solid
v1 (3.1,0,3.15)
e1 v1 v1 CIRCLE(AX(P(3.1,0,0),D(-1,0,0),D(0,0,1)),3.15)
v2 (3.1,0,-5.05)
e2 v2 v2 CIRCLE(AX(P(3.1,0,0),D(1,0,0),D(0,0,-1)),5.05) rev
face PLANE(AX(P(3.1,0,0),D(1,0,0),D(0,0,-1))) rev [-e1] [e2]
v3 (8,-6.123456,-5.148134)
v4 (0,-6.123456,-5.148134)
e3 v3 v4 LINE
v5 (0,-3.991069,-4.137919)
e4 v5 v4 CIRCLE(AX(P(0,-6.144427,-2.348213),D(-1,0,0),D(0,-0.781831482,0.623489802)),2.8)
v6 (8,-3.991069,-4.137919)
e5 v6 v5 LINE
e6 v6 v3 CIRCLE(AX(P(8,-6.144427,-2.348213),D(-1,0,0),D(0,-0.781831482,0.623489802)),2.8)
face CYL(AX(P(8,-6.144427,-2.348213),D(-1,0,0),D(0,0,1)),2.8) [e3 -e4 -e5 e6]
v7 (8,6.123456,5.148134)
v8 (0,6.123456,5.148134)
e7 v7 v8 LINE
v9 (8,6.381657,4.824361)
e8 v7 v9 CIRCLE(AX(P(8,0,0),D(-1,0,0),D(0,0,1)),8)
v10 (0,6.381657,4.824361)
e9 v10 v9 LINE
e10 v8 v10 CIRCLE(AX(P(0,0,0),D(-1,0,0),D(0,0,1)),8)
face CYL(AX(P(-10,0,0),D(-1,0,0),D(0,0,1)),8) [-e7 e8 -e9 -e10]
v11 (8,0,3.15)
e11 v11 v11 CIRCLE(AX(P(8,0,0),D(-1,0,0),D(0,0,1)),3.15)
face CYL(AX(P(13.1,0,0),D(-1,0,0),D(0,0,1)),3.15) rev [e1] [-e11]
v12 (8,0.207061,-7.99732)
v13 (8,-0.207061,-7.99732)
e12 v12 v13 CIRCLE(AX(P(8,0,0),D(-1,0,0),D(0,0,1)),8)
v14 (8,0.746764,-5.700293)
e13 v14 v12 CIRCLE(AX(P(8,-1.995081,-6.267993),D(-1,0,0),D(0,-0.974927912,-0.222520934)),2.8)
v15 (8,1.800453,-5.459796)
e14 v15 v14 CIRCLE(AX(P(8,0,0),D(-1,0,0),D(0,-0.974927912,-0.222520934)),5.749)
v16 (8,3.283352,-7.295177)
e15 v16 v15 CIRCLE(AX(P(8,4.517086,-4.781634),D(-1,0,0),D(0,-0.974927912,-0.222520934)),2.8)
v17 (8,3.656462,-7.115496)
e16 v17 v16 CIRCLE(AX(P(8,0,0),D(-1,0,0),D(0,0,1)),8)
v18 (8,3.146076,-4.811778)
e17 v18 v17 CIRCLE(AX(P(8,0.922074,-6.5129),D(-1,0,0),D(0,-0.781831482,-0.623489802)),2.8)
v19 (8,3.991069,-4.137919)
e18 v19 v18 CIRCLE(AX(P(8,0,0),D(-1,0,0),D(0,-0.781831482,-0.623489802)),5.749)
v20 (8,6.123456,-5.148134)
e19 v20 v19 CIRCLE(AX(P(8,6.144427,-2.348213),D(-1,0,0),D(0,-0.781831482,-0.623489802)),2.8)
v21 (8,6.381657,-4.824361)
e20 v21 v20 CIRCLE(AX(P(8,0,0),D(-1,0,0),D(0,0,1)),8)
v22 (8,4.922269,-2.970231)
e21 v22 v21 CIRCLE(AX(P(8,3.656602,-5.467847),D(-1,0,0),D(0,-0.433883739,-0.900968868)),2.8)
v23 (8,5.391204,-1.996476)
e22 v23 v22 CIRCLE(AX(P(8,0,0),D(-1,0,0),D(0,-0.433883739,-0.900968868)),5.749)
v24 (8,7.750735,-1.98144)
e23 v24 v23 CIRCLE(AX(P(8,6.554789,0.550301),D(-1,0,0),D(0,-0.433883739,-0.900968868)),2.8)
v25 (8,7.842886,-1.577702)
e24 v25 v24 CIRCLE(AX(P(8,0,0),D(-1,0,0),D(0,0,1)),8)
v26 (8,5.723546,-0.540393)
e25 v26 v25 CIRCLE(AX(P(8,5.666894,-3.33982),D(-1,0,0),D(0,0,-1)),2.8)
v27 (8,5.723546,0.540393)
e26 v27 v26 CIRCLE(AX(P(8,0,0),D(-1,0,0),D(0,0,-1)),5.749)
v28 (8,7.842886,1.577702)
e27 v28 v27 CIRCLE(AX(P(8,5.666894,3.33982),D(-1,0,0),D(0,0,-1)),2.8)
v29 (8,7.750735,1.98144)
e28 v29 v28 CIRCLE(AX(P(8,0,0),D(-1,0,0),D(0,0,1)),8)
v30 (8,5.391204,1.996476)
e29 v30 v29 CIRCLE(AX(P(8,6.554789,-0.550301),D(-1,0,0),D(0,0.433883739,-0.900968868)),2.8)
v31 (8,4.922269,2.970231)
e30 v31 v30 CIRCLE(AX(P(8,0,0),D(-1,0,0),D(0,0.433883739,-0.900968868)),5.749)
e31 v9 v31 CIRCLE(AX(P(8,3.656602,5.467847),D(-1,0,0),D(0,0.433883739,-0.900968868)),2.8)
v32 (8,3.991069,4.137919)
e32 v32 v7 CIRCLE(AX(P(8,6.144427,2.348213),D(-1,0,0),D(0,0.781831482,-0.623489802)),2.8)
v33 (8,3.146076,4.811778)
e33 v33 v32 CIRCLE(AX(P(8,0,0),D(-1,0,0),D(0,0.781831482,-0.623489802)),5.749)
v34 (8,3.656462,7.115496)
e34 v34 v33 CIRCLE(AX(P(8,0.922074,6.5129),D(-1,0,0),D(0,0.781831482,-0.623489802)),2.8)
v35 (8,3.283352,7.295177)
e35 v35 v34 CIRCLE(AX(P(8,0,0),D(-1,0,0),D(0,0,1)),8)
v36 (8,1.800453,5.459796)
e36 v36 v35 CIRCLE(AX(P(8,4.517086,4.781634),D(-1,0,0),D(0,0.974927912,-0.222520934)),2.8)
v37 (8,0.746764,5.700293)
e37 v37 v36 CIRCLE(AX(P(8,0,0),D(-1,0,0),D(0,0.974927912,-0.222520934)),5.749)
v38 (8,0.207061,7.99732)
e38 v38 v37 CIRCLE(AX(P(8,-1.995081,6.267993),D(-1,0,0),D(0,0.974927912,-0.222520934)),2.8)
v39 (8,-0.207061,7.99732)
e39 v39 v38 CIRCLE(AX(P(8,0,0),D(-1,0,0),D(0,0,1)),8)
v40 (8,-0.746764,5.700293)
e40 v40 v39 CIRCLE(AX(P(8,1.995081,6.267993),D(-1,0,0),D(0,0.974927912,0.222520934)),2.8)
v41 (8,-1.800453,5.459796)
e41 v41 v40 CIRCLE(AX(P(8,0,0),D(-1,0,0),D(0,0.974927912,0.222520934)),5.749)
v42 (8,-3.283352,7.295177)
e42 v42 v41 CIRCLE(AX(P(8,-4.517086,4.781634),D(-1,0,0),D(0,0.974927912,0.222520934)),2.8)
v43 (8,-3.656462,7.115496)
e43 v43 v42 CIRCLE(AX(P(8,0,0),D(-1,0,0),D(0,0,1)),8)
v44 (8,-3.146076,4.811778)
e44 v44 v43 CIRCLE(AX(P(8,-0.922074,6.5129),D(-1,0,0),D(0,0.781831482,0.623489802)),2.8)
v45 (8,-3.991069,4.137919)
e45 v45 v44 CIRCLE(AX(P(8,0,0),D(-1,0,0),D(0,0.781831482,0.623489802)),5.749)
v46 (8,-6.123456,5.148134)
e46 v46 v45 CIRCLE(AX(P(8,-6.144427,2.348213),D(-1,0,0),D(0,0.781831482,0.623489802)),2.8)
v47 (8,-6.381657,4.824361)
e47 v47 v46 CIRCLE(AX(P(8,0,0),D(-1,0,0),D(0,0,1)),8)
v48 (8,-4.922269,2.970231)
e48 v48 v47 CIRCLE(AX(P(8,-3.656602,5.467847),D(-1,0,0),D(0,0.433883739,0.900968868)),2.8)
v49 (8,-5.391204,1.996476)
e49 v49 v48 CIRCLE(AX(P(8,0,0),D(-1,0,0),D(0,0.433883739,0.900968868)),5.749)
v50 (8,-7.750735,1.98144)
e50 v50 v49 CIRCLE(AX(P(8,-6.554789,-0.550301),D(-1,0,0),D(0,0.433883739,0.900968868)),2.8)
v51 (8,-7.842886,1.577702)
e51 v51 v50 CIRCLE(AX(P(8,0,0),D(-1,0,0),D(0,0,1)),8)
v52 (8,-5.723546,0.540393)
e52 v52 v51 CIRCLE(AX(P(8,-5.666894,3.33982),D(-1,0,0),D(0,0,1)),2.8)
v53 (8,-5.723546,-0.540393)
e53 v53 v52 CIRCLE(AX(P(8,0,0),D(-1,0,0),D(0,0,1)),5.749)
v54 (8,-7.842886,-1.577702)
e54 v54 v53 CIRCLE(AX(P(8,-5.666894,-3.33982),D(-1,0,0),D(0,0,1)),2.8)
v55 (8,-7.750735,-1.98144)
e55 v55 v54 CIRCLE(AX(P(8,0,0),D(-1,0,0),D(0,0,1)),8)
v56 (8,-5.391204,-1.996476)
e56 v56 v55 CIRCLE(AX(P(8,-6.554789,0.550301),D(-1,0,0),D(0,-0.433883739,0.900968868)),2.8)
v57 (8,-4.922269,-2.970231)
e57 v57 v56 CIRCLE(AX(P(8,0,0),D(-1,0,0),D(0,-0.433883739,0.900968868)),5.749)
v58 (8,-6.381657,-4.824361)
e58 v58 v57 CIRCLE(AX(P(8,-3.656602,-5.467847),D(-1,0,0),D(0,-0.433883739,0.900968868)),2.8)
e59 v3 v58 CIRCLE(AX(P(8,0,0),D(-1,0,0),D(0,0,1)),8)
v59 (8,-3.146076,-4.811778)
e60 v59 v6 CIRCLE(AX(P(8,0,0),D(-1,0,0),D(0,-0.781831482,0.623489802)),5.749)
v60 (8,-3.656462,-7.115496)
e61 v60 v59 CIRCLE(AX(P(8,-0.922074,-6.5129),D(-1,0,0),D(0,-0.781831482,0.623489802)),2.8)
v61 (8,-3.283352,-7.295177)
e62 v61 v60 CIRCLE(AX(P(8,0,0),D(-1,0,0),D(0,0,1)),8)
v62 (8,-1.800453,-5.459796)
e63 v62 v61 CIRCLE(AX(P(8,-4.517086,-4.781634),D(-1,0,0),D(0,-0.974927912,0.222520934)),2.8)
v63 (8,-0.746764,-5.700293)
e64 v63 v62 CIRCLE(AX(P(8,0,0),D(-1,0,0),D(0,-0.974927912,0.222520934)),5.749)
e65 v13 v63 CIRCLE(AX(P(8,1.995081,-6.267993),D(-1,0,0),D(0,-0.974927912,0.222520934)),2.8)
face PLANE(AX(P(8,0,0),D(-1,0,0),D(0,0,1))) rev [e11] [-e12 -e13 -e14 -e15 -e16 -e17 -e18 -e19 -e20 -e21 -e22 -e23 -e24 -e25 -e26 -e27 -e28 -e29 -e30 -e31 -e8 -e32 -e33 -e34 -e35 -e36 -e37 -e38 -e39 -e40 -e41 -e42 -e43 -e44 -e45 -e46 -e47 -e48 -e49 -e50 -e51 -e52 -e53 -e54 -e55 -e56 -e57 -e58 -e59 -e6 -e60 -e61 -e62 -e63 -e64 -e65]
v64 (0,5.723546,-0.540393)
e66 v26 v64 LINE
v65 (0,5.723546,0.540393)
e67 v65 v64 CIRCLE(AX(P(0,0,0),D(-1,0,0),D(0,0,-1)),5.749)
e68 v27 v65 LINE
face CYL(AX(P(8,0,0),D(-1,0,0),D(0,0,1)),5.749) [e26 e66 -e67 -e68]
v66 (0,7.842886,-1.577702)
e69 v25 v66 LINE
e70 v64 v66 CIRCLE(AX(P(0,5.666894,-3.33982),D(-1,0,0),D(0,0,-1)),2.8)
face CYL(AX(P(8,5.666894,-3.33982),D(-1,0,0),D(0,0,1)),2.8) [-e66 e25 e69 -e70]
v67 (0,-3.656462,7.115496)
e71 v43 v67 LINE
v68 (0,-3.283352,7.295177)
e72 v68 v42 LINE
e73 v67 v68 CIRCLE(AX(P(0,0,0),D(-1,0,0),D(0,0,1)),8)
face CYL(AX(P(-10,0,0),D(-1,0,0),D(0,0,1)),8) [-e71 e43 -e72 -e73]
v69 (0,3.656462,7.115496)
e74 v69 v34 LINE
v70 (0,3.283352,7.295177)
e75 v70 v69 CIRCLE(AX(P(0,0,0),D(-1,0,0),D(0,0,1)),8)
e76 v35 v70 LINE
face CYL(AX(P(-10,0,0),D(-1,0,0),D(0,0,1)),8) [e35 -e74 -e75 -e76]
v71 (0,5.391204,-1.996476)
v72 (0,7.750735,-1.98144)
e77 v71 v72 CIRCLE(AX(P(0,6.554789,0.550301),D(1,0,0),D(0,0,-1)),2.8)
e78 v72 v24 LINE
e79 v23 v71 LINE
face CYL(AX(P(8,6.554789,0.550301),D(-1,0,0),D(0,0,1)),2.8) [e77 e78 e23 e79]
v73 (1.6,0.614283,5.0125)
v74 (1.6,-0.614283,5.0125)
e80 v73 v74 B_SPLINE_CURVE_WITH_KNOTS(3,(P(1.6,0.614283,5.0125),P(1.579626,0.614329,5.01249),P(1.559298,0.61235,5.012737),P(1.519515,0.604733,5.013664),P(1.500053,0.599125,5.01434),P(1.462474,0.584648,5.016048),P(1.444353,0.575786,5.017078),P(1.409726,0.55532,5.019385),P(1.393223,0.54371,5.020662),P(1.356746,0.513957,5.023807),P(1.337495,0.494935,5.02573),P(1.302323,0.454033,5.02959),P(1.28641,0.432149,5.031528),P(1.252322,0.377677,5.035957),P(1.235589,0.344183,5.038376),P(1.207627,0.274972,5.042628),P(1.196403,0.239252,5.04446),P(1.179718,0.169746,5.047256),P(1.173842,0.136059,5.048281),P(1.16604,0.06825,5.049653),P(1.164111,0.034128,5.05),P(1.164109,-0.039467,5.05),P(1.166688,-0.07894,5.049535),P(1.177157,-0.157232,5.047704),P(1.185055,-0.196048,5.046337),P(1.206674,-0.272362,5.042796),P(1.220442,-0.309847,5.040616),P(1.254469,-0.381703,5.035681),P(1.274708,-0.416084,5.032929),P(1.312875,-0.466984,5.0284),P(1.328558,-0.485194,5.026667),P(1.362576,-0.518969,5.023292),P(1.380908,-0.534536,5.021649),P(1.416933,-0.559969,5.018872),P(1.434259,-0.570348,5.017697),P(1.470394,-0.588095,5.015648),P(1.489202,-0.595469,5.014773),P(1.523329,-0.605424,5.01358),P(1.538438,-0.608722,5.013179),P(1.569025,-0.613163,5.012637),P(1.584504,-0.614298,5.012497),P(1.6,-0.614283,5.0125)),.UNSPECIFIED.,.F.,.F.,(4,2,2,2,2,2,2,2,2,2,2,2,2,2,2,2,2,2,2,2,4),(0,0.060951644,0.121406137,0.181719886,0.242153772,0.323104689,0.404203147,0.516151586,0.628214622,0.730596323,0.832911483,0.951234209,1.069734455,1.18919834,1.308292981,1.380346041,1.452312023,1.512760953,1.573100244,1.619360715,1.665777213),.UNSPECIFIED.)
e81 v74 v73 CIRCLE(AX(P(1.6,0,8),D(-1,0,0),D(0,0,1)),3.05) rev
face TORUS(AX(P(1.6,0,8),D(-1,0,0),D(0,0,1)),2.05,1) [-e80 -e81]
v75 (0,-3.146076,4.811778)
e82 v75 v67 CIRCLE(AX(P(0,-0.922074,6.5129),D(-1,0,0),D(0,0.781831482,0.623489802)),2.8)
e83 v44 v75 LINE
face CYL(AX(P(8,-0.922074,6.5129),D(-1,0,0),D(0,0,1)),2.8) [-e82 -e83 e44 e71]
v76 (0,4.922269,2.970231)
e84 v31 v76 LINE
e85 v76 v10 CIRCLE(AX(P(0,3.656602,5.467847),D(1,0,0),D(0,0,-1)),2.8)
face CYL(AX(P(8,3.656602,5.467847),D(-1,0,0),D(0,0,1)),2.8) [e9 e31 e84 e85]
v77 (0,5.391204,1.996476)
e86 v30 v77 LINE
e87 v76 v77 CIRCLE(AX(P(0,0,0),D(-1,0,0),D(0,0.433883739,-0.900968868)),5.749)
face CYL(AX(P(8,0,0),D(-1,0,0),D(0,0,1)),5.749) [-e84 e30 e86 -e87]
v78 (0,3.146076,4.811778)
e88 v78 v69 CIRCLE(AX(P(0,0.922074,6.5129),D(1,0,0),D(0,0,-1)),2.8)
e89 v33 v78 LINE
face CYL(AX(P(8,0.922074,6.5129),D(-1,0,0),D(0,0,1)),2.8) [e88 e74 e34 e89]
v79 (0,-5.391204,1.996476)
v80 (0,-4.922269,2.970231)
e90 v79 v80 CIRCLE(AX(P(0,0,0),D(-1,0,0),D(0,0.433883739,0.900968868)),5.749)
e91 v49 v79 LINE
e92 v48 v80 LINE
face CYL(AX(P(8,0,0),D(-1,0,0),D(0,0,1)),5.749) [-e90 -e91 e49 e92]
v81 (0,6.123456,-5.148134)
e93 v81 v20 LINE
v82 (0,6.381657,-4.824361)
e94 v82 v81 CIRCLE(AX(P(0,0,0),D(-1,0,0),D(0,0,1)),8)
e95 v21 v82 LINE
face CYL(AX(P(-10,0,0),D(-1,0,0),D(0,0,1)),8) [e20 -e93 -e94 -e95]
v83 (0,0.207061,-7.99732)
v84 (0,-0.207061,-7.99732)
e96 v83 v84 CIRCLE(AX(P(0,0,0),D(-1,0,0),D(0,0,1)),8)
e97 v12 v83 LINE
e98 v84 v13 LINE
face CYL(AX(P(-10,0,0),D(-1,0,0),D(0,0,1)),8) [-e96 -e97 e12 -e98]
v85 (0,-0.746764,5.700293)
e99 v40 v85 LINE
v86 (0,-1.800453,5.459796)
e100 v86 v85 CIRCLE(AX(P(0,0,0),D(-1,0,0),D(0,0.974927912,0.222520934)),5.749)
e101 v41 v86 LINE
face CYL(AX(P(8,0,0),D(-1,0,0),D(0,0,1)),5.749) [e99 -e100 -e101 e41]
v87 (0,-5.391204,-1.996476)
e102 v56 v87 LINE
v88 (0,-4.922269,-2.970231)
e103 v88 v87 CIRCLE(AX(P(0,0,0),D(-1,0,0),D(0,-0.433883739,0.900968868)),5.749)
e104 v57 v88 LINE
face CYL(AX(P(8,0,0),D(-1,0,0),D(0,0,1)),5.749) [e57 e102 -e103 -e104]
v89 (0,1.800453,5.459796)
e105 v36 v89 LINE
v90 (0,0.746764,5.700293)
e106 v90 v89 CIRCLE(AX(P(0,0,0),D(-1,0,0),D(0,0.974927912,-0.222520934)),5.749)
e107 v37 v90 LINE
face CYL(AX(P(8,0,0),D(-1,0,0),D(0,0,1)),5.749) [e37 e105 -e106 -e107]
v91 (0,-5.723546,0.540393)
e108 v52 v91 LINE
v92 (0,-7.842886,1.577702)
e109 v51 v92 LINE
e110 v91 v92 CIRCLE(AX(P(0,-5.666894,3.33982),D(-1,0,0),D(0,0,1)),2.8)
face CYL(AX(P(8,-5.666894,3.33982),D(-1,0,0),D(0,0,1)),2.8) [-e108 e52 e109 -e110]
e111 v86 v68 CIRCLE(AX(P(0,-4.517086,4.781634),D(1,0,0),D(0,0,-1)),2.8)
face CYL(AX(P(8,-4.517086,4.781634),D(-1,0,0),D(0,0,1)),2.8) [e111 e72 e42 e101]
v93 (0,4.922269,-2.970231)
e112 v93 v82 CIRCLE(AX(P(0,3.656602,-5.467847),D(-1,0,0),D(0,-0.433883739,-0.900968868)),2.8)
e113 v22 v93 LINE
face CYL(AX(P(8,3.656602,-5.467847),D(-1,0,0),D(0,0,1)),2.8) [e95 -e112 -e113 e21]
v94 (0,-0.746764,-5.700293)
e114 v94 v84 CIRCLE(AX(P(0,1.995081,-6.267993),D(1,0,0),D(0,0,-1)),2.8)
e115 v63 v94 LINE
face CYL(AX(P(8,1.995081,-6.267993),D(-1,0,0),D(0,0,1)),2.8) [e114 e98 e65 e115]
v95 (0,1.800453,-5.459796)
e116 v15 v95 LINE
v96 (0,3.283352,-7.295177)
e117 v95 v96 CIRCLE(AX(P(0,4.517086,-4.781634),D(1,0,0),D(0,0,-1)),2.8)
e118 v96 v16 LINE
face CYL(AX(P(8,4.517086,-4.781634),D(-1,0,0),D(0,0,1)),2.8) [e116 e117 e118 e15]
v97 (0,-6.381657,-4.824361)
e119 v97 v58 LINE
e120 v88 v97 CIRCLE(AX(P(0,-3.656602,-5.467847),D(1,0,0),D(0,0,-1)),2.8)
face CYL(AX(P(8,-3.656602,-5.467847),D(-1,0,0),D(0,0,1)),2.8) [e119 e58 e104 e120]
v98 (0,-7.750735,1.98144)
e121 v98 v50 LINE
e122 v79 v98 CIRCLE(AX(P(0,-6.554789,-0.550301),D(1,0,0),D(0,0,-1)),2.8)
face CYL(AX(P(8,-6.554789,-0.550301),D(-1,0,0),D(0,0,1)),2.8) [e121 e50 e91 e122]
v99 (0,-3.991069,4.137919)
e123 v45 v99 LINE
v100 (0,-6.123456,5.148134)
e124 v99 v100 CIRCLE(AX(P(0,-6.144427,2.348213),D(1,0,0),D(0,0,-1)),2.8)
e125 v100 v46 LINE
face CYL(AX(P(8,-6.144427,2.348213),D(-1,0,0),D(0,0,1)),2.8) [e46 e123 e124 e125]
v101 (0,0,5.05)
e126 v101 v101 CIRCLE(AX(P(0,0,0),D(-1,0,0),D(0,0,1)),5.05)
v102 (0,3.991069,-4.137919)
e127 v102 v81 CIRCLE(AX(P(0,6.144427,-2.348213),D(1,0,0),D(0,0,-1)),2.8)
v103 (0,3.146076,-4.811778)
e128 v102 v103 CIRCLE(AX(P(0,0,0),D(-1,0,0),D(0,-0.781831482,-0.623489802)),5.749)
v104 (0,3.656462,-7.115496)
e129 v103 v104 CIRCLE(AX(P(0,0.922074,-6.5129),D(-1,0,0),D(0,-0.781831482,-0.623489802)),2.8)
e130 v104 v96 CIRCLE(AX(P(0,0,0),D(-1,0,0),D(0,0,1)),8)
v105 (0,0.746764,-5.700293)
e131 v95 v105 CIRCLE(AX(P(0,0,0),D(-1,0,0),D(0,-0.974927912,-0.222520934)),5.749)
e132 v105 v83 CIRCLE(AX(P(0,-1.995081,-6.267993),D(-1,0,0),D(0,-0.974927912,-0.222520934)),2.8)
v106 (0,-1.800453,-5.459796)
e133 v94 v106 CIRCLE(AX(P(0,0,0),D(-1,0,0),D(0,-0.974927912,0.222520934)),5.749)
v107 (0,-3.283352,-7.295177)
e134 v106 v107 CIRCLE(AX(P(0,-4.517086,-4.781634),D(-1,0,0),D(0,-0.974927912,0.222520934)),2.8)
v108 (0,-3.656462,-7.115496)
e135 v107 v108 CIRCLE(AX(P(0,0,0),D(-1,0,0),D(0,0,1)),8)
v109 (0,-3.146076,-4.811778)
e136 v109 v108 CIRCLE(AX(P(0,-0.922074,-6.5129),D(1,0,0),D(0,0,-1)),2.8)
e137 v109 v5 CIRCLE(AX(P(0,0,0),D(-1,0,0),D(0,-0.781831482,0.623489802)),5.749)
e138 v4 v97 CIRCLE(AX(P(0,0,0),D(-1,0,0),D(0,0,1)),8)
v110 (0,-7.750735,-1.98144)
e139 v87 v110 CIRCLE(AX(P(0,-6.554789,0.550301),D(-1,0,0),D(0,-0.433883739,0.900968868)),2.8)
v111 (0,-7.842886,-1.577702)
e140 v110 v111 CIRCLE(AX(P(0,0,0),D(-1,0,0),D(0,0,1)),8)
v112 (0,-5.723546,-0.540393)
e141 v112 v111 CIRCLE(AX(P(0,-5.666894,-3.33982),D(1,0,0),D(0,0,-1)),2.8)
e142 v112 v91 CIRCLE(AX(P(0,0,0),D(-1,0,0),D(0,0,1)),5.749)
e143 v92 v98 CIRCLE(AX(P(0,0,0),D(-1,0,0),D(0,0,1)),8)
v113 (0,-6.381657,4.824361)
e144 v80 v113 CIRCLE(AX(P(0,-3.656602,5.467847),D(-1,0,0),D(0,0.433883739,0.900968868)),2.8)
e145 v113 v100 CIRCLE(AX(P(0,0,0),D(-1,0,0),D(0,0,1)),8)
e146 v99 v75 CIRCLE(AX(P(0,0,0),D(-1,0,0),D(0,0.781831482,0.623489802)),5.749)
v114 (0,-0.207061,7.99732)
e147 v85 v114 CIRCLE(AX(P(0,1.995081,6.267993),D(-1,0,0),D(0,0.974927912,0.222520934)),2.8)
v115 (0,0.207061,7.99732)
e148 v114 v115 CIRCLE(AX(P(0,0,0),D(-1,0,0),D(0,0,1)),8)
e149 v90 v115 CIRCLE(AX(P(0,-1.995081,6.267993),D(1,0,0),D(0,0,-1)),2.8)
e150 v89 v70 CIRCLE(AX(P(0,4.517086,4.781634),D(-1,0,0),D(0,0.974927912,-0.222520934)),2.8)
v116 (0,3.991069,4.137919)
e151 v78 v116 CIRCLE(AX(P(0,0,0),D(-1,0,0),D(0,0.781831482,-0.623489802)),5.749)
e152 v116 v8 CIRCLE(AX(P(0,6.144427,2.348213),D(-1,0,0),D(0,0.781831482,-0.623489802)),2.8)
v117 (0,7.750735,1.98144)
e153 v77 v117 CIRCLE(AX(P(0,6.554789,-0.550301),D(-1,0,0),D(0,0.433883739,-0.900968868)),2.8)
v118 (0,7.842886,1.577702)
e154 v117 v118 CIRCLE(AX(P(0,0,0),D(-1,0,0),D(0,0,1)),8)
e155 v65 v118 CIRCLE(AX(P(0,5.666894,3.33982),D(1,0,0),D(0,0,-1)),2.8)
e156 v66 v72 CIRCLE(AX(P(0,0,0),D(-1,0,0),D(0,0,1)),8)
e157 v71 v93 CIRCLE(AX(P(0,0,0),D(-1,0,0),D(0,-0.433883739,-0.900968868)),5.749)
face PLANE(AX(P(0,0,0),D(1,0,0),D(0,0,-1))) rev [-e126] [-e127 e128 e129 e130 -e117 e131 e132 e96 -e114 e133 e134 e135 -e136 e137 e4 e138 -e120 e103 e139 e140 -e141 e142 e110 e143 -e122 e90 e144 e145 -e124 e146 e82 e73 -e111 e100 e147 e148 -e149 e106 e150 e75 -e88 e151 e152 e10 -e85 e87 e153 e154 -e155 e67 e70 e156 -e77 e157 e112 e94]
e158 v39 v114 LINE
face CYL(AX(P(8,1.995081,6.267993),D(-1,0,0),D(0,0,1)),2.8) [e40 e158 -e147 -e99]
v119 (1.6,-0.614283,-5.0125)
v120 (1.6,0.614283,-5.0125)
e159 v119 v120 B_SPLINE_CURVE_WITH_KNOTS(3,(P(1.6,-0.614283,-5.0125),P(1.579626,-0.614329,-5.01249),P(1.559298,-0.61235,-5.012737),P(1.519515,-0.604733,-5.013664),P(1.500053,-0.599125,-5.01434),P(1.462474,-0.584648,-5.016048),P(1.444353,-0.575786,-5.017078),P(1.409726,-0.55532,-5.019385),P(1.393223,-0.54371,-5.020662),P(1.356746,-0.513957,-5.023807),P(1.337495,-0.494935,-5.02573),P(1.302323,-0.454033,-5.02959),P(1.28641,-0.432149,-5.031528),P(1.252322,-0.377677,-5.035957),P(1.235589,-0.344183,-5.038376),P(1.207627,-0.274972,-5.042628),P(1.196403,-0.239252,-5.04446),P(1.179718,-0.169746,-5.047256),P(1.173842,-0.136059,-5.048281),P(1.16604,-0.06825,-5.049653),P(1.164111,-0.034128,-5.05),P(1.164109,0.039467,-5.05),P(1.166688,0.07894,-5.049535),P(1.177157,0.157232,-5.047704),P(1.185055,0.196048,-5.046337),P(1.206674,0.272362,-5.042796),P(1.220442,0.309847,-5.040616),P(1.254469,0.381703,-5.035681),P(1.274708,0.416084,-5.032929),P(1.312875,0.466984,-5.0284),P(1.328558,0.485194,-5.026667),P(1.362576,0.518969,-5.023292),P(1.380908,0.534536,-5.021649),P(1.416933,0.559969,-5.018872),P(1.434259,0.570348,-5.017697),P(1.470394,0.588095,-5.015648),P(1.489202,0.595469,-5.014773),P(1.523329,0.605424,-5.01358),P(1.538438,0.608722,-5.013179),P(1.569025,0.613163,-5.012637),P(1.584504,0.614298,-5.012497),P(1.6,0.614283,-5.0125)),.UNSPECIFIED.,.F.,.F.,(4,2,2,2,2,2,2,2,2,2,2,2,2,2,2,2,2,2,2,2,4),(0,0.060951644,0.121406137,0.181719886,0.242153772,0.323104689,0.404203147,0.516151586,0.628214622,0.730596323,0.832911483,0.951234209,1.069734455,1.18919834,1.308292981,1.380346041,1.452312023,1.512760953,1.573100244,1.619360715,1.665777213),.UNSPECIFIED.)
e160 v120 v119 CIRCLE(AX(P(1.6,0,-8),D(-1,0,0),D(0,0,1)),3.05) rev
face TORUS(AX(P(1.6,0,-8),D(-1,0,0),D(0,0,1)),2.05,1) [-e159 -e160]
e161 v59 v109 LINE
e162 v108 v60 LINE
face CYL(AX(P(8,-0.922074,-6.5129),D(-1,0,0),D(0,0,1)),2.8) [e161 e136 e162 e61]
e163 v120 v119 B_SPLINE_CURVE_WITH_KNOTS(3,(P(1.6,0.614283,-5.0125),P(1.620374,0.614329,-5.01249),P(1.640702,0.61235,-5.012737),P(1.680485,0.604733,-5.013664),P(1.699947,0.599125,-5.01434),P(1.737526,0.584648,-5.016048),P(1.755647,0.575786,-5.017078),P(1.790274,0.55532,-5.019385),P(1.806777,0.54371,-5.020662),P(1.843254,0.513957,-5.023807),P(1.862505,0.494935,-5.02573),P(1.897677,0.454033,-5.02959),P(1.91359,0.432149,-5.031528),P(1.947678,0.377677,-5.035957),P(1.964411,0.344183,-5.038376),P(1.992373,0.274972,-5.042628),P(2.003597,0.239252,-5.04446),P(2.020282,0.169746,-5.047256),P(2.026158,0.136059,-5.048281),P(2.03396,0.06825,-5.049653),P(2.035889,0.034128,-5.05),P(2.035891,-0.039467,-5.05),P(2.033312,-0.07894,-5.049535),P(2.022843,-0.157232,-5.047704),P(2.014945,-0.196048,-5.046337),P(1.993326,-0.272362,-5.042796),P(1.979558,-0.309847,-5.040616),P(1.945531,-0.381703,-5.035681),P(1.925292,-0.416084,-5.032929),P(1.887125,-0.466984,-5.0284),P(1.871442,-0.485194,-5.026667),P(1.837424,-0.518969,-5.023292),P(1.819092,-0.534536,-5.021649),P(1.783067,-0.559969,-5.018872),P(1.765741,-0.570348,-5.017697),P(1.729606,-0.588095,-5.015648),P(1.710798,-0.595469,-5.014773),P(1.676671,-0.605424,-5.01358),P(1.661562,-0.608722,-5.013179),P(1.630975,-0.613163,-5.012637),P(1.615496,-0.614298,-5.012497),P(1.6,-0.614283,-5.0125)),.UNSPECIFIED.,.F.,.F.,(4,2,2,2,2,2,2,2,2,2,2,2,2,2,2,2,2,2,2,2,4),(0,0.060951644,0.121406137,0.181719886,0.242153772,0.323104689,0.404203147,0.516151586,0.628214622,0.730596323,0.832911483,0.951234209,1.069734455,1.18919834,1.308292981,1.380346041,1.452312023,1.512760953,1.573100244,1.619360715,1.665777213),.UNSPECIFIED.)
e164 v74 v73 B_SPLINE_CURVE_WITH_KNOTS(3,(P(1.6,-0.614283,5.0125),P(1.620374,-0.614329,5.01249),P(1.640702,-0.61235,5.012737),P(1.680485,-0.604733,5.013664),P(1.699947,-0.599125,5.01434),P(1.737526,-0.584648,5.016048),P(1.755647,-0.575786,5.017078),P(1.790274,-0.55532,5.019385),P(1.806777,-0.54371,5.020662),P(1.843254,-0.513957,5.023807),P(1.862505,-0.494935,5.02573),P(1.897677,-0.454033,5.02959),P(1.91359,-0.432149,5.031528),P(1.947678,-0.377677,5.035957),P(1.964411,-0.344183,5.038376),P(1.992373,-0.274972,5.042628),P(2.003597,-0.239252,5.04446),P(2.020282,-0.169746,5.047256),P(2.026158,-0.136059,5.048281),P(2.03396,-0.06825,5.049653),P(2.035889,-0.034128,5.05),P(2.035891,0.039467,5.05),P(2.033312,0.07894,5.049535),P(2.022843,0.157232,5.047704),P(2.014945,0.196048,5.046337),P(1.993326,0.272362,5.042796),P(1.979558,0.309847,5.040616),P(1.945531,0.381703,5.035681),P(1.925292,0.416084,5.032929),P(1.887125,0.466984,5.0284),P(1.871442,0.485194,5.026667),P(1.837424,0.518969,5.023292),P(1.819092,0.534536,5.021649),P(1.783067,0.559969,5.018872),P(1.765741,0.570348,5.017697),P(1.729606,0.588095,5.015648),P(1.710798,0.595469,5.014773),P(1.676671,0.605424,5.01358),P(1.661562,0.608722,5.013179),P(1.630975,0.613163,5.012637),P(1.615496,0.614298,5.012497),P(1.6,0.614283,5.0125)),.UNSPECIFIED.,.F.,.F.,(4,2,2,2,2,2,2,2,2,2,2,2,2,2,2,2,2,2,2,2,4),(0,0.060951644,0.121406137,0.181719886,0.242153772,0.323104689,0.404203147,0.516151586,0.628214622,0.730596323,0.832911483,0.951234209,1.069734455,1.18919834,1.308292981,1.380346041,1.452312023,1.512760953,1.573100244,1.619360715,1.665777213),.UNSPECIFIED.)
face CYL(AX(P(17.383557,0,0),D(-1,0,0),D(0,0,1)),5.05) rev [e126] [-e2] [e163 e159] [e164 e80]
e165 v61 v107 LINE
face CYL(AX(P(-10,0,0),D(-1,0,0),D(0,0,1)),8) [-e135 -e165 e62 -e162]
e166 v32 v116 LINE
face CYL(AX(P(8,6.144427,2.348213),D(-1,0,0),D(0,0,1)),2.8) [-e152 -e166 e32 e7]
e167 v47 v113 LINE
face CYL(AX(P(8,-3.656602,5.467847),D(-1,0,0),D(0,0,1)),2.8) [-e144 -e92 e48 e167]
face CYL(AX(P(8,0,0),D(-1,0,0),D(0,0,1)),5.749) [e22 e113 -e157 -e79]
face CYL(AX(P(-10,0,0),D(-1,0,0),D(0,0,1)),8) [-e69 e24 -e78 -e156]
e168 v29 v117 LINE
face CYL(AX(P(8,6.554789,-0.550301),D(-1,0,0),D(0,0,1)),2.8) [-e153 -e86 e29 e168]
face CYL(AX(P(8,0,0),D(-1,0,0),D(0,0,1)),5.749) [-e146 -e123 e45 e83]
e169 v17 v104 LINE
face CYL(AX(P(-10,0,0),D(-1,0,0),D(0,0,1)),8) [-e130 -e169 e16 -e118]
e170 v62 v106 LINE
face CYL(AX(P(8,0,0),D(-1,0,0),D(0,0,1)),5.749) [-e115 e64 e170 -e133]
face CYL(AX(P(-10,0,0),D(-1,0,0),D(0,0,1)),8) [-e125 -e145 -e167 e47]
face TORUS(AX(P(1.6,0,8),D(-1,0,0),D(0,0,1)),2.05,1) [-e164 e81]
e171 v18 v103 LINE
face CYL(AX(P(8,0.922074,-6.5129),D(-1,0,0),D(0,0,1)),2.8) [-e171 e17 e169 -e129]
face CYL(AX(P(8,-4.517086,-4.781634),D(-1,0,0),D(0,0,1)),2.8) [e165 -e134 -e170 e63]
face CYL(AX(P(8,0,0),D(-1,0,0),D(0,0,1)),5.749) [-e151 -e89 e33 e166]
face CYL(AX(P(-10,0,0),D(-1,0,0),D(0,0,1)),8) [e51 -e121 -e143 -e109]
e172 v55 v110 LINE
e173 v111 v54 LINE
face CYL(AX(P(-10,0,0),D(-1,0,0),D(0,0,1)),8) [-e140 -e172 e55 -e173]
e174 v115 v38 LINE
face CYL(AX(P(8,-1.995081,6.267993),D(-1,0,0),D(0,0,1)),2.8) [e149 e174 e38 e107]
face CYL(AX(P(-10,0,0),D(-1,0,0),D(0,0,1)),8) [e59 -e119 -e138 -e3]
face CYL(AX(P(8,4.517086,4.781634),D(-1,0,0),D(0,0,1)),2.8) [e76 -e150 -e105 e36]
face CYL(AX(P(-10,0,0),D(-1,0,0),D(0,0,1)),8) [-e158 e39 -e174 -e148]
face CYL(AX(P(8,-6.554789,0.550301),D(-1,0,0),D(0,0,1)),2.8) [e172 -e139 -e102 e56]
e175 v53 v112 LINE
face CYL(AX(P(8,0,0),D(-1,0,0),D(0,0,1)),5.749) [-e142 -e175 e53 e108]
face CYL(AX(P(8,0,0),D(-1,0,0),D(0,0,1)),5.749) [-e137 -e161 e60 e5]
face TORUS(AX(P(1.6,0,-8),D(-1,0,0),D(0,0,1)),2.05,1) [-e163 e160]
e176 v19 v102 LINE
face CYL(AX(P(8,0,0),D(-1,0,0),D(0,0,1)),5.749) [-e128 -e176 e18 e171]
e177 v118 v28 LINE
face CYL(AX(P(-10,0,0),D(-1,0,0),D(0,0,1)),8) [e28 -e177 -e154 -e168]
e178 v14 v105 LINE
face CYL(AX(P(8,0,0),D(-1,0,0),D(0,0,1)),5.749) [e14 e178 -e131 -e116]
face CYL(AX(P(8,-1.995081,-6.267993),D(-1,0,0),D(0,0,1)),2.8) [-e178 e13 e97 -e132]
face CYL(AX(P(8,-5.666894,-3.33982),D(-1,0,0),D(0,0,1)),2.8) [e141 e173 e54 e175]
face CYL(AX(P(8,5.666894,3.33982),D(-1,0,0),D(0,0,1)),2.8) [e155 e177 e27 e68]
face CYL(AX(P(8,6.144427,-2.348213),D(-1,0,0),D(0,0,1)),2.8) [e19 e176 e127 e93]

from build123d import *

# Parameters (mm, degrees)
BOSS_EXTRUDE1_START       = -4.9
BOSS_EXTRUDE1_DEPTH       = 4.9
BOSS_EXTRUDE1_START_2     = -8
BOSS_EXTRUDE1_2_OUTLINE_R = 5
BOSS_EXTRUDE1_2_DEPTH     = 3.1
SKETCH2_R                 = 5.05
CUT_EXTRUDE1_DEPTH        = 3.1
SKETCH3_R                 = 3.25
CUT_EXTRUDE2_DEPTH        = 13.227872143
SKETCH4_R                 = 4
CUT_EXTRUDE3_DEPTH        = 10
SKETCH5_R                 = 4
SKETCH5_R_2               = 3
BOSS_EXTRUDE2_DEPTH       = 4.9
BOSS_EXTRUDE3_DEPTH       = 1
BOSS_EXTRUDE3_DEPTH_BACK  = 1
FILLET1_R                 = 1
SKETCH8_R                 = 3.15
CUT_EXTRUDE4_DEPTH        = 10


with BuildPart() as part:
    # Boss-Extrude1: read off the stored shape, not the designer's step
    # Boss-Extrude1 outline → Boss-Extrude1 (new body)
    with BuildSketch(Plane(origin=(8, 0, 0), x_dir=(0, 0, -1), z_dir=(1, 0, 0)).offset(BOSS_EXTRUDE1_START)):
        with BuildLine():
            ThreePointArc((-7.295176575, -3.283351754), (-7.207750943, -3.471069913), (-7.115495966, -3.656462382))
            ThreePointArc((-7.115495966, -3.656462382), (-5.907248739, -3.655787226), (-4.811777955, -3.146075955))
            ThreePointArc((-4.811777955, -3.146075955), (-4.494749193, -3.584442871), (-4.137918587, -3.991068875))
            ThreePointArc((-4.137918587, -3.991068875), (-4.878615514, -4.945652492), (-5.148134044, -6.123456202))
            ThreePointArc((-5.148134044, -6.123456202), (-4.987918415, -6.25465186), (-4.824360775, -6.381656769))
            ThreePointArc((-4.824360775, -6.381656769), (-3.736060578, -5.856809649), (-2.970230937, -4.922268702))
            ThreePointArc((-2.970230937, -4.922268702), (-2.494397616, -5.179670022), (-1.996475938, -5.391204395))
            ThreePointArc((-1.996475938, -5.391204395), (-2.249642501, -6.572630868), (-1.981440428, -7.750735051))
            ThreePointArc((-1.981440428, -7.750735051), (-1.780167471, -7.799423297), (-1.577701765, -7.842885766))
            ThreePointArc((-1.577701765, -7.842885766), (-0.824899799, -6.897819092), (-0.540393256, -5.723545765))
            ThreePointArc((-0.540393256, -5.723545765), (0, -5.749), (0.540393256, -5.723545765))
            ThreePointArc((0.540393256, -5.723545765), (0.824899799, -6.897819092), (1.577701765, -7.842885766))
            ThreePointArc((1.577701765, -7.842885766), (1.780167471, -7.799423297), (1.981440428, -7.750735051))
            ThreePointArc((1.981440428, -7.750735051), (2.249642501, -6.572630868), (1.996475938, -5.391204395))
            ThreePointArc((1.996475938, -5.391204395), (2.494397616, -5.179670022), (2.970230937, -4.922268702))
            ThreePointArc((2.970230937, -4.922268702), (3.736060578, -5.856809649), (4.824360775, -6.381656769))
            ThreePointArc((4.824360775, -6.381656769), (4.987918415, -6.25465186), (5.148134044, -6.123456202))
            ThreePointArc((5.148134044, -6.123456202), (4.878615514, -4.945652492), (4.137918587, -3.991068875))
            ThreePointArc((4.137918587, -3.991068875), (4.494749193, -3.584442871), (4.811777955, -3.146075955))
            ThreePointArc((4.811777955, -3.146075955), (5.907248739, -3.655787226), (7.115495966, -3.656462382))
            ThreePointArc((7.115495966, -3.656462382), (7.207750943, -3.471069913), (7.295176575, -3.283351754))
            ThreePointArc((7.295176575, -3.283351754), (6.541318892, -2.339126986), (5.459795711, -1.800453218))
            ThreePointArc((5.459795711, -1.800453218), (5.604860567, -1.27927285), (5.700293335, -0.746764281))
            ThreePointArc((5.700293335, -0.746764281), (6.90843384, -0.730691307), (7.997319916, -0.207060777))
            ThreePointArc((7.997319916, -0.207060777), (8, 0), (7.997319916, 0.207060777))
            ThreePointArc((7.997319916, 0.207060777), (6.90843384, 0.730691307), (5.700293335, 0.746764281))
            ThreePointArc((5.700293335, 0.746764281), (5.604860567, 1.27927285), (5.459795711, 1.800453218))
            ThreePointArc((5.459795711, 1.800453218), (6.541318892, 2.339126986), (7.295176575, 3.283351754))
            ThreePointArc((7.295176575, 3.283351754), (7.207750943, 3.471069913), (7.115495966, 3.656462382))
            ThreePointArc((7.115495966, 3.656462382), (5.907248739, 3.655787226), (4.811777955, 3.146075955))
            ThreePointArc((4.811777955, 3.146075955), (4.494749193, 3.584442871), (4.137918587, 3.991068875))
            ThreePointArc((4.137918587, 3.991068875), (4.878615514, 4.945652492), (5.148134044, 6.123456202))
            ThreePointArc((5.148134044, 6.123456202), (4.987918415, 6.25465186), (4.824360775, 6.381656769))
            ThreePointArc((4.824360775, 6.381656769), (3.736060578, 5.856809649), (2.970230937, 4.922268702))
            ThreePointArc((2.970230937, 4.922268702), (2.494397616, 5.179670022), (1.996475938, 5.391204395))
            ThreePointArc((1.996475938, 5.391204395), (2.249642501, 6.572630868), (1.981440428, 7.750735051))
            ThreePointArc((1.981440428, 7.750735051), (1.780167471, 7.799423297), (1.577701765, 7.842885766))
            ThreePointArc((1.577701765, 7.842885766), (0.824899799, 6.897819092), (0.540393256, 5.723545765))
            ThreePointArc((0.540393256, 5.723545765), (0, 5.749), (-0.540393256, 5.723545765))
            ThreePointArc((-0.540393256, 5.723545765), (-0.824899799, 6.897819092), (-1.577701765, 7.842885766))
            ThreePointArc((-1.577701765, 7.842885766), (-1.780167471, 7.799423297), (-1.981440428, 7.750735051))
            ThreePointArc((-1.981440428, 7.750735051), (-2.249642501, 6.572630868), (-1.996475938, 5.391204395))
            ThreePointArc((-1.996475938, 5.391204395), (-2.494397616, 5.179670022), (-2.970230937, 4.922268702))
            ThreePointArc((-2.970230937, 4.922268702), (-3.736060578, 5.856809649), (-4.824360775, 6.381656769))
            ThreePointArc((-4.824360775, 6.381656769), (-4.987918415, 6.25465186), (-5.148134044, 6.123456202))
            ThreePointArc((-5.148134044, 6.123456202), (-4.878615514, 4.945652492), (-4.137918587, 3.991068875))
            ThreePointArc((-4.137918587, 3.991068875), (-4.494749193, 3.584442871), (-4.811777955, 3.146075955))
            ThreePointArc((-4.811777955, 3.146075955), (-5.907248739, 3.655787226), (-7.115495966, 3.656462382))
            ThreePointArc((-7.115495966, 3.656462382), (-7.207750943, 3.471069913), (-7.295176575, 3.283351754))
            ThreePointArc((-7.295176575, 3.283351754), (-6.541318892, 2.339126986), (-5.459795711, 1.800453218))
            ThreePointArc((-5.459795711, 1.800453218), (-5.604860567, 1.27927285), (-5.700293335, 0.746764281))
            ThreePointArc((-5.700293335, 0.746764281), (-6.90843384, 0.730691307), (-7.997319916, 0.207060777))
            ThreePointArc((-7.997319916, 0.207060777), (-8, 0), (-7.997319916, -0.207060777))
            ThreePointArc((-7.997319916, -0.207060777), (-6.90843384, -0.730691307), (-5.700293335, -0.746764281))
            ThreePointArc((-5.700293335, -0.746764281), (-5.604860567, -1.27927285), (-5.459795711, -1.800453218))
            ThreePointArc((-5.459795711, -1.800453218), (-6.541318892, -2.339126986), (-7.295176575, -3.283351754))
        make_face()
    extrude(amount=BOSS_EXTRUDE1_DEPTH)

    # Boss-Extrude1 2 outline → Boss-Extrude1 2 (add)
    with BuildSketch(Plane(origin=(8, 0, 0), x_dir=(0, 0, -1), z_dir=(1, 0, 0)).offset(BOSS_EXTRUDE1_START_2)):
        with BuildLine():
            ThreePointArc((-7.295176575, -3.283351754), (-7.207750943, -3.471069913), (-7.115495966, -3.656462382))
            ThreePointArc((-7.115495966, -3.656462382), (-5.907248739, -3.655787226), (-4.811777955, -3.146075955))
            ThreePointArc((-4.811777955, -3.146075955), (-4.494749193, -3.584442871), (-4.137918587, -3.991068875))
            ThreePointArc((-4.137918587, -3.991068875), (-4.878615514, -4.945652492), (-5.148134044, -6.123456202))
            ThreePointArc((-5.148134044, -6.123456202), (-4.987918415, -6.25465186), (-4.824360775, -6.381656769))
            ThreePointArc((-4.824360775, -6.381656769), (-3.736060578, -5.856809649), (-2.970230937, -4.922268702))
            ThreePointArc((-2.970230937, -4.922268702), (-2.494397616, -5.179670022), (-1.996475938, -5.391204395))
            ThreePointArc((-1.996475938, -5.391204395), (-2.249642501, -6.572630868), (-1.981440428, -7.750735051))
            ThreePointArc((-1.981440428, -7.750735051), (-1.780167471, -7.799423297), (-1.577701765, -7.842885766))
            ThreePointArc((-1.577701765, -7.842885766), (-0.824899799, -6.897819092), (-0.540393256, -5.723545765))
            ThreePointArc((-0.540393256, -5.723545765), (0, -5.749), (0.540393256, -5.723545765))
            ThreePointArc((0.540393256, -5.723545765), (0.824899799, -6.897819092), (1.577701765, -7.842885766))
            ThreePointArc((1.577701765, -7.842885766), (1.780167471, -7.799423297), (1.981440428, -7.750735051))
            ThreePointArc((1.981440428, -7.750735051), (2.249642501, -6.572630868), (1.996475938, -5.391204395))
            ThreePointArc((1.996475938, -5.391204395), (2.494397616, -5.179670022), (2.970230937, -4.922268702))
            ThreePointArc((2.970230937, -4.922268702), (3.736060578, -5.856809649), (4.824360775, -6.381656769))
            ThreePointArc((4.824360775, -6.381656769), (4.987918415, -6.25465186), (5.148134044, -6.123456202))
            ThreePointArc((5.148134044, -6.123456202), (4.878615514, -4.945652492), (4.137918587, -3.991068875))
            ThreePointArc((4.137918587, -3.991068875), (4.494749193, -3.584442871), (4.811777955, -3.146075955))
            ThreePointArc((4.811777955, -3.146075955), (5.907248739, -3.655787226), (7.115495966, -3.656462382))
            ThreePointArc((7.115495966, -3.656462382), (7.207750943, -3.471069913), (7.295176575, -3.283351754))
            ThreePointArc((7.295176575, -3.283351754), (6.541318892, -2.339126986), (5.459795711, -1.800453218))
            ThreePointArc((5.459795711, -1.800453218), (5.604860567, -1.27927285), (5.700293335, -0.746764281))
            ThreePointArc((5.700293335, -0.746764281), (6.90843384, -0.730691307), (7.997319916, -0.207060777))
            ThreePointArc((7.997319916, -0.207060777), (8, 0), (7.997319916, 0.207060777))
            ThreePointArc((7.997319916, 0.207060777), (6.90843384, 0.730691307), (5.700293335, 0.746764281))
            ThreePointArc((5.700293335, 0.746764281), (5.604860567, 1.27927285), (5.459795711, 1.800453218))
            ThreePointArc((5.459795711, 1.800453218), (6.541318892, 2.339126986), (7.295176575, 3.283351754))
            ThreePointArc((7.295176575, 3.283351754), (7.207750943, 3.471069913), (7.115495966, 3.656462382))
            ThreePointArc((7.115495966, 3.656462382), (5.907248739, 3.655787226), (4.811777955, 3.146075955))
            ThreePointArc((4.811777955, 3.146075955), (4.494749193, 3.584442871), (4.137918587, 3.991068875))
            ThreePointArc((4.137918587, 3.991068875), (4.878615514, 4.945652492), (5.148134044, 6.123456202))
            ThreePointArc((5.148134044, 6.123456202), (4.987918415, 6.25465186), (4.824360775, 6.381656769))
            ThreePointArc((4.824360775, 6.381656769), (3.736060578, 5.856809649), (2.970230937, 4.922268702))
            ThreePointArc((2.970230937, 4.922268702), (2.494397616, 5.179670022), (1.996475938, 5.391204395))
            ThreePointArc((1.996475938, 5.391204395), (2.249642501, 6.572630868), (1.981440428, 7.750735051))
            ThreePointArc((1.981440428, 7.750735051), (1.780167471, 7.799423297), (1.577701765, 7.842885766))
            ThreePointArc((1.577701765, 7.842885766), (0.824899799, 6.897819092), (0.540393256, 5.723545765))
            ThreePointArc((0.540393256, 5.723545765), (0, 5.749), (-0.540393256, 5.723545765))
            ThreePointArc((-0.540393256, 5.723545765), (-0.824899799, 6.897819092), (-1.577701765, 7.842885766))
            ThreePointArc((-1.577701765, 7.842885766), (-1.780167471, 7.799423297), (-1.981440428, 7.750735051))
            ThreePointArc((-1.981440428, 7.750735051), (-2.249642501, 6.572630868), (-1.996475938, 5.391204395))
            ThreePointArc((-1.996475938, 5.391204395), (-2.494397616, 5.179670022), (-2.970230937, 4.922268702))
            ThreePointArc((-2.970230937, 4.922268702), (-3.736060578, 5.856809649), (-4.824360775, 6.381656769))
            ThreePointArc((-4.824360775, 6.381656769), (-4.987918415, 6.25465186), (-5.148134044, 6.123456202))
            ThreePointArc((-5.148134044, 6.123456202), (-4.878615514, 4.945652492), (-4.137918587, 3.991068875))
            ThreePointArc((-4.137918587, 3.991068875), (-4.494749193, 3.584442871), (-4.811777955, 3.146075955))
            ThreePointArc((-4.811777955, 3.146075955), (-5.907248739, 3.655787226), (-7.115495966, 3.656462382))
            ThreePointArc((-7.115495966, 3.656462382), (-7.207750943, 3.471069913), (-7.295176575, 3.283351754))
            ThreePointArc((-7.295176575, 3.283351754), (-6.541318892, 2.339126986), (-5.459795711, 1.800453218))
            ThreePointArc((-5.459795711, 1.800453218), (-5.604860567, 1.27927285), (-5.700293335, 0.746764281))
            ThreePointArc((-5.700293335, 0.746764281), (-6.90843384, 0.730691307), (-7.997319916, 0.207060777))
            ThreePointArc((-7.997319916, 0.207060777), (-8, 0), (-7.997319916, -0.207060777))
            ThreePointArc((-7.997319916, -0.207060777), (-6.90843384, -0.730691307), (-5.700293335, -0.746764281))
            ThreePointArc((-5.700293335, -0.746764281), (-5.604860567, -1.27927285), (-5.459795711, -1.800453218))
            ThreePointArc((-5.459795711, -1.800453218), (-6.541318892, -2.339126986), (-7.295176575, -3.283351754))
        make_face()
        Circle(BOSS_EXTRUDE1_2_OUTLINE_R, mode=Mode.SUBTRACT)
    extrude(amount=BOSS_EXTRUDE1_2_DEPTH)

    # Sketch2 → Cut-Extrude1 (cut)
    with BuildSketch(Plane.ZY):
        Circle(SKETCH2_R)
    extrude(amount=-CUT_EXTRUDE1_DEPTH, mode=Mode.SUBTRACT)

    # Sketch3 → Cut-Extrude2 (cut, through all)
    with BuildSketch(Plane.ZY.offset(-3.1)):
        Circle(SKETCH3_R)
    extrude(amount=-CUT_EXTRUDE2_DEPTH, mode=Mode.SUBTRACT)

    # Sketch4 → Cut-Extrude3 (cut)
    with BuildSketch(Plane(origin=(8, 0, 0), x_dir=(0, 0, -1), z_dir=(1, 0, 0))):
        Circle(SKETCH4_R)
    extrude(amount=-CUT_EXTRUDE3_DEPTH, mode=Mode.SUBTRACT)

    # Sketch5 → Boss-Extrude2 (add)
    with BuildSketch(Plane(origin=(8, 0, 0), x_dir=(0, 0, -1), z_dir=(1, 0, 0))):
        Circle(SKETCH5_R)
        Circle(SKETCH5_R_2, mode=Mode.SUBTRACT)
    extrude(amount=-BOSS_EXTRUDE2_DEPTH)

    # Sketch7 → Boss-Extrude3 (add, two sides: drawn at the far end of the back side and taken through both)
    with BuildSketch(Plane.ZY.offset(-1.6).offset(-BOSS_EXTRUDE3_DEPTH_BACK)):
        with BuildLine():
            ThreePointArc((5.096691895, -0.934506311), (5.181657101, 0), (5.096691895, 0.934506311))
            ThreePointArc((5.096691895, 0.934506311), (4.95, 0), (5.096691895, -0.934506311))
        make_face()
        with BuildLine():
            ThreePointArc((-5.096691895, -0.934506311), (-4.95, 0), (-5.096691895, 0.934506311))
            ThreePointArc((-5.096691895, 0.934506311), (-5.181657101, 0), (-5.096691895, -0.934506311))
        make_face()
    extrude(amount=BOSS_EXTRUDE3_DEPTH + BOSS_EXTRUDE3_DEPTH_BACK)

    # Fillet1
    # the kernel refuses this fillet: 1 mm, written as the material it takes off along each edge
    with BuildSketch(Plane(origin=(0.6, 0, 8), x_dir=(0, 0.853406197512974, -0.5212464503921795), z_dir=(0, 0.5212464503921795, 0.853406197512974))) as fillet1_piece_1_section:
        with BuildLine():
            CenterArc((3.05 - FILLET1_R, -FILLET1_R), FILLET1_R, 0, 90)
            Line((3.05, -FILLET1_R), (3.05, 0))
            Line((3.05, 0), (3.05 - FILLET1_R, 0))
        make_face()
    fillet1_piece_1 = revolve(axis=Axis((0.6, 0, 8), (-1, 0, 0)), revolution_arc=117.16820376, mode=Mode.PRIVATE)
    fillet1_piece_1 = fillet1_piece_1 & Plane(origin=(0.6, 0, 0), x_dir=(0, 0, 1), z_dir=(-1, 0, 0)) * Cylinder(5.05, 13, mode=Mode.PRIVATE)
    add(fillet1_piece_1, mode=Mode.SUBTRACT)
    with BuildSketch(Plane(origin=(0.6, 0, -8), x_dir=(0, -0.8534061975130341, 0.521246450392081), z_dir=(0, -0.521246450392081, -0.8534061975130341))) as fillet1_piece_2_section:
        with BuildLine():
            CenterArc((3.05 - FILLET1_R, -FILLET1_R), FILLET1_R, 0, 90)
            Line((3.05 - FILLET1_R, 0), (3.05, 0))
            Line((3.05, 0), (3.05, -FILLET1_R))
        make_face()
    fillet1_piece_2 = revolve(axis=Axis((0.6, 0, -8), (-1, 0, 0)), revolution_arc=117.16820376, mode=Mode.PRIVATE)
    fillet1_piece_2 = fillet1_piece_2 & Plane(origin=(0.6, 0, 0), x_dir=(0, 0, 1), z_dir=(-1, 0, 0)) * Cylinder(5.05, 13, mode=Mode.PRIVATE)
    add(fillet1_piece_2, mode=Mode.SUBTRACT)
    with BuildSketch(Plane(origin=(2.6, 0, -8), x_dir=(0, -0.8534061975130341, 0.521246450392081), z_dir=(0, -0.521246450392081, -0.8534061975130341))) as fillet1_piece_3_section:
        with BuildLine():
            CenterArc((3.05 - FILLET1_R, FILLET1_R), FILLET1_R, 270, 90)
            Line((3.05 - FILLET1_R, 0), (3.05, 0))
            Line((3.05, 0), (3.05, FILLET1_R))
        make_face()
    fillet1_piece_3 = revolve(axis=Axis((2.6, 0, -8), (-1, 0, 0)), revolution_arc=117.16820376, mode=Mode.PRIVATE)
    fillet1_piece_3 = fillet1_piece_3 & Plane(origin=(2.6, 0, 0), x_dir=(0, 0, 1), z_dir=(-1, 0, 0)) * Cylinder(5.05, 13, mode=Mode.PRIVATE)
    add(fillet1_piece_3, mode=Mode.SUBTRACT)
    with BuildSketch(Plane(origin=(2.6, 0, 8), x_dir=(0, 0.853406197512974, -0.5212464503921795), z_dir=(0, 0.5212464503921795, 0.853406197512974))) as fillet1_piece_4_section:
        with BuildLine():
            CenterArc((3.05 - FILLET1_R, FILLET1_R), FILLET1_R, 270, 90)
            Line((3.05 - FILLET1_R, 0), (3.05, 0))
            Line((3.05, 0), (3.05, FILLET1_R))
        make_face()
    fillet1_piece_4 = revolve(axis=Axis((2.6, 0, 8), (-1, 0, 0)), revolution_arc=117.16820376, mode=Mode.PRIVATE)
    fillet1_piece_4 = fillet1_piece_4 & Plane(origin=(2.6, 0, 0), x_dir=(0, 0, 1), z_dir=(-1, 0, 0)) * Cylinder(5.05, 13, mode=Mode.PRIVATE)
    add(fillet1_piece_4, mode=Mode.SUBTRACT)

    # Sketch8 → Cut-Extrude4 (cut)
    with BuildSketch(Plane.ZY.offset(-3.1)):
        Circle(SKETCH8_R)
    extrude(amount=-CUT_EXTRUDE4_DEPTH, mode=Mode.SUBTRACT)


solid = part.part
